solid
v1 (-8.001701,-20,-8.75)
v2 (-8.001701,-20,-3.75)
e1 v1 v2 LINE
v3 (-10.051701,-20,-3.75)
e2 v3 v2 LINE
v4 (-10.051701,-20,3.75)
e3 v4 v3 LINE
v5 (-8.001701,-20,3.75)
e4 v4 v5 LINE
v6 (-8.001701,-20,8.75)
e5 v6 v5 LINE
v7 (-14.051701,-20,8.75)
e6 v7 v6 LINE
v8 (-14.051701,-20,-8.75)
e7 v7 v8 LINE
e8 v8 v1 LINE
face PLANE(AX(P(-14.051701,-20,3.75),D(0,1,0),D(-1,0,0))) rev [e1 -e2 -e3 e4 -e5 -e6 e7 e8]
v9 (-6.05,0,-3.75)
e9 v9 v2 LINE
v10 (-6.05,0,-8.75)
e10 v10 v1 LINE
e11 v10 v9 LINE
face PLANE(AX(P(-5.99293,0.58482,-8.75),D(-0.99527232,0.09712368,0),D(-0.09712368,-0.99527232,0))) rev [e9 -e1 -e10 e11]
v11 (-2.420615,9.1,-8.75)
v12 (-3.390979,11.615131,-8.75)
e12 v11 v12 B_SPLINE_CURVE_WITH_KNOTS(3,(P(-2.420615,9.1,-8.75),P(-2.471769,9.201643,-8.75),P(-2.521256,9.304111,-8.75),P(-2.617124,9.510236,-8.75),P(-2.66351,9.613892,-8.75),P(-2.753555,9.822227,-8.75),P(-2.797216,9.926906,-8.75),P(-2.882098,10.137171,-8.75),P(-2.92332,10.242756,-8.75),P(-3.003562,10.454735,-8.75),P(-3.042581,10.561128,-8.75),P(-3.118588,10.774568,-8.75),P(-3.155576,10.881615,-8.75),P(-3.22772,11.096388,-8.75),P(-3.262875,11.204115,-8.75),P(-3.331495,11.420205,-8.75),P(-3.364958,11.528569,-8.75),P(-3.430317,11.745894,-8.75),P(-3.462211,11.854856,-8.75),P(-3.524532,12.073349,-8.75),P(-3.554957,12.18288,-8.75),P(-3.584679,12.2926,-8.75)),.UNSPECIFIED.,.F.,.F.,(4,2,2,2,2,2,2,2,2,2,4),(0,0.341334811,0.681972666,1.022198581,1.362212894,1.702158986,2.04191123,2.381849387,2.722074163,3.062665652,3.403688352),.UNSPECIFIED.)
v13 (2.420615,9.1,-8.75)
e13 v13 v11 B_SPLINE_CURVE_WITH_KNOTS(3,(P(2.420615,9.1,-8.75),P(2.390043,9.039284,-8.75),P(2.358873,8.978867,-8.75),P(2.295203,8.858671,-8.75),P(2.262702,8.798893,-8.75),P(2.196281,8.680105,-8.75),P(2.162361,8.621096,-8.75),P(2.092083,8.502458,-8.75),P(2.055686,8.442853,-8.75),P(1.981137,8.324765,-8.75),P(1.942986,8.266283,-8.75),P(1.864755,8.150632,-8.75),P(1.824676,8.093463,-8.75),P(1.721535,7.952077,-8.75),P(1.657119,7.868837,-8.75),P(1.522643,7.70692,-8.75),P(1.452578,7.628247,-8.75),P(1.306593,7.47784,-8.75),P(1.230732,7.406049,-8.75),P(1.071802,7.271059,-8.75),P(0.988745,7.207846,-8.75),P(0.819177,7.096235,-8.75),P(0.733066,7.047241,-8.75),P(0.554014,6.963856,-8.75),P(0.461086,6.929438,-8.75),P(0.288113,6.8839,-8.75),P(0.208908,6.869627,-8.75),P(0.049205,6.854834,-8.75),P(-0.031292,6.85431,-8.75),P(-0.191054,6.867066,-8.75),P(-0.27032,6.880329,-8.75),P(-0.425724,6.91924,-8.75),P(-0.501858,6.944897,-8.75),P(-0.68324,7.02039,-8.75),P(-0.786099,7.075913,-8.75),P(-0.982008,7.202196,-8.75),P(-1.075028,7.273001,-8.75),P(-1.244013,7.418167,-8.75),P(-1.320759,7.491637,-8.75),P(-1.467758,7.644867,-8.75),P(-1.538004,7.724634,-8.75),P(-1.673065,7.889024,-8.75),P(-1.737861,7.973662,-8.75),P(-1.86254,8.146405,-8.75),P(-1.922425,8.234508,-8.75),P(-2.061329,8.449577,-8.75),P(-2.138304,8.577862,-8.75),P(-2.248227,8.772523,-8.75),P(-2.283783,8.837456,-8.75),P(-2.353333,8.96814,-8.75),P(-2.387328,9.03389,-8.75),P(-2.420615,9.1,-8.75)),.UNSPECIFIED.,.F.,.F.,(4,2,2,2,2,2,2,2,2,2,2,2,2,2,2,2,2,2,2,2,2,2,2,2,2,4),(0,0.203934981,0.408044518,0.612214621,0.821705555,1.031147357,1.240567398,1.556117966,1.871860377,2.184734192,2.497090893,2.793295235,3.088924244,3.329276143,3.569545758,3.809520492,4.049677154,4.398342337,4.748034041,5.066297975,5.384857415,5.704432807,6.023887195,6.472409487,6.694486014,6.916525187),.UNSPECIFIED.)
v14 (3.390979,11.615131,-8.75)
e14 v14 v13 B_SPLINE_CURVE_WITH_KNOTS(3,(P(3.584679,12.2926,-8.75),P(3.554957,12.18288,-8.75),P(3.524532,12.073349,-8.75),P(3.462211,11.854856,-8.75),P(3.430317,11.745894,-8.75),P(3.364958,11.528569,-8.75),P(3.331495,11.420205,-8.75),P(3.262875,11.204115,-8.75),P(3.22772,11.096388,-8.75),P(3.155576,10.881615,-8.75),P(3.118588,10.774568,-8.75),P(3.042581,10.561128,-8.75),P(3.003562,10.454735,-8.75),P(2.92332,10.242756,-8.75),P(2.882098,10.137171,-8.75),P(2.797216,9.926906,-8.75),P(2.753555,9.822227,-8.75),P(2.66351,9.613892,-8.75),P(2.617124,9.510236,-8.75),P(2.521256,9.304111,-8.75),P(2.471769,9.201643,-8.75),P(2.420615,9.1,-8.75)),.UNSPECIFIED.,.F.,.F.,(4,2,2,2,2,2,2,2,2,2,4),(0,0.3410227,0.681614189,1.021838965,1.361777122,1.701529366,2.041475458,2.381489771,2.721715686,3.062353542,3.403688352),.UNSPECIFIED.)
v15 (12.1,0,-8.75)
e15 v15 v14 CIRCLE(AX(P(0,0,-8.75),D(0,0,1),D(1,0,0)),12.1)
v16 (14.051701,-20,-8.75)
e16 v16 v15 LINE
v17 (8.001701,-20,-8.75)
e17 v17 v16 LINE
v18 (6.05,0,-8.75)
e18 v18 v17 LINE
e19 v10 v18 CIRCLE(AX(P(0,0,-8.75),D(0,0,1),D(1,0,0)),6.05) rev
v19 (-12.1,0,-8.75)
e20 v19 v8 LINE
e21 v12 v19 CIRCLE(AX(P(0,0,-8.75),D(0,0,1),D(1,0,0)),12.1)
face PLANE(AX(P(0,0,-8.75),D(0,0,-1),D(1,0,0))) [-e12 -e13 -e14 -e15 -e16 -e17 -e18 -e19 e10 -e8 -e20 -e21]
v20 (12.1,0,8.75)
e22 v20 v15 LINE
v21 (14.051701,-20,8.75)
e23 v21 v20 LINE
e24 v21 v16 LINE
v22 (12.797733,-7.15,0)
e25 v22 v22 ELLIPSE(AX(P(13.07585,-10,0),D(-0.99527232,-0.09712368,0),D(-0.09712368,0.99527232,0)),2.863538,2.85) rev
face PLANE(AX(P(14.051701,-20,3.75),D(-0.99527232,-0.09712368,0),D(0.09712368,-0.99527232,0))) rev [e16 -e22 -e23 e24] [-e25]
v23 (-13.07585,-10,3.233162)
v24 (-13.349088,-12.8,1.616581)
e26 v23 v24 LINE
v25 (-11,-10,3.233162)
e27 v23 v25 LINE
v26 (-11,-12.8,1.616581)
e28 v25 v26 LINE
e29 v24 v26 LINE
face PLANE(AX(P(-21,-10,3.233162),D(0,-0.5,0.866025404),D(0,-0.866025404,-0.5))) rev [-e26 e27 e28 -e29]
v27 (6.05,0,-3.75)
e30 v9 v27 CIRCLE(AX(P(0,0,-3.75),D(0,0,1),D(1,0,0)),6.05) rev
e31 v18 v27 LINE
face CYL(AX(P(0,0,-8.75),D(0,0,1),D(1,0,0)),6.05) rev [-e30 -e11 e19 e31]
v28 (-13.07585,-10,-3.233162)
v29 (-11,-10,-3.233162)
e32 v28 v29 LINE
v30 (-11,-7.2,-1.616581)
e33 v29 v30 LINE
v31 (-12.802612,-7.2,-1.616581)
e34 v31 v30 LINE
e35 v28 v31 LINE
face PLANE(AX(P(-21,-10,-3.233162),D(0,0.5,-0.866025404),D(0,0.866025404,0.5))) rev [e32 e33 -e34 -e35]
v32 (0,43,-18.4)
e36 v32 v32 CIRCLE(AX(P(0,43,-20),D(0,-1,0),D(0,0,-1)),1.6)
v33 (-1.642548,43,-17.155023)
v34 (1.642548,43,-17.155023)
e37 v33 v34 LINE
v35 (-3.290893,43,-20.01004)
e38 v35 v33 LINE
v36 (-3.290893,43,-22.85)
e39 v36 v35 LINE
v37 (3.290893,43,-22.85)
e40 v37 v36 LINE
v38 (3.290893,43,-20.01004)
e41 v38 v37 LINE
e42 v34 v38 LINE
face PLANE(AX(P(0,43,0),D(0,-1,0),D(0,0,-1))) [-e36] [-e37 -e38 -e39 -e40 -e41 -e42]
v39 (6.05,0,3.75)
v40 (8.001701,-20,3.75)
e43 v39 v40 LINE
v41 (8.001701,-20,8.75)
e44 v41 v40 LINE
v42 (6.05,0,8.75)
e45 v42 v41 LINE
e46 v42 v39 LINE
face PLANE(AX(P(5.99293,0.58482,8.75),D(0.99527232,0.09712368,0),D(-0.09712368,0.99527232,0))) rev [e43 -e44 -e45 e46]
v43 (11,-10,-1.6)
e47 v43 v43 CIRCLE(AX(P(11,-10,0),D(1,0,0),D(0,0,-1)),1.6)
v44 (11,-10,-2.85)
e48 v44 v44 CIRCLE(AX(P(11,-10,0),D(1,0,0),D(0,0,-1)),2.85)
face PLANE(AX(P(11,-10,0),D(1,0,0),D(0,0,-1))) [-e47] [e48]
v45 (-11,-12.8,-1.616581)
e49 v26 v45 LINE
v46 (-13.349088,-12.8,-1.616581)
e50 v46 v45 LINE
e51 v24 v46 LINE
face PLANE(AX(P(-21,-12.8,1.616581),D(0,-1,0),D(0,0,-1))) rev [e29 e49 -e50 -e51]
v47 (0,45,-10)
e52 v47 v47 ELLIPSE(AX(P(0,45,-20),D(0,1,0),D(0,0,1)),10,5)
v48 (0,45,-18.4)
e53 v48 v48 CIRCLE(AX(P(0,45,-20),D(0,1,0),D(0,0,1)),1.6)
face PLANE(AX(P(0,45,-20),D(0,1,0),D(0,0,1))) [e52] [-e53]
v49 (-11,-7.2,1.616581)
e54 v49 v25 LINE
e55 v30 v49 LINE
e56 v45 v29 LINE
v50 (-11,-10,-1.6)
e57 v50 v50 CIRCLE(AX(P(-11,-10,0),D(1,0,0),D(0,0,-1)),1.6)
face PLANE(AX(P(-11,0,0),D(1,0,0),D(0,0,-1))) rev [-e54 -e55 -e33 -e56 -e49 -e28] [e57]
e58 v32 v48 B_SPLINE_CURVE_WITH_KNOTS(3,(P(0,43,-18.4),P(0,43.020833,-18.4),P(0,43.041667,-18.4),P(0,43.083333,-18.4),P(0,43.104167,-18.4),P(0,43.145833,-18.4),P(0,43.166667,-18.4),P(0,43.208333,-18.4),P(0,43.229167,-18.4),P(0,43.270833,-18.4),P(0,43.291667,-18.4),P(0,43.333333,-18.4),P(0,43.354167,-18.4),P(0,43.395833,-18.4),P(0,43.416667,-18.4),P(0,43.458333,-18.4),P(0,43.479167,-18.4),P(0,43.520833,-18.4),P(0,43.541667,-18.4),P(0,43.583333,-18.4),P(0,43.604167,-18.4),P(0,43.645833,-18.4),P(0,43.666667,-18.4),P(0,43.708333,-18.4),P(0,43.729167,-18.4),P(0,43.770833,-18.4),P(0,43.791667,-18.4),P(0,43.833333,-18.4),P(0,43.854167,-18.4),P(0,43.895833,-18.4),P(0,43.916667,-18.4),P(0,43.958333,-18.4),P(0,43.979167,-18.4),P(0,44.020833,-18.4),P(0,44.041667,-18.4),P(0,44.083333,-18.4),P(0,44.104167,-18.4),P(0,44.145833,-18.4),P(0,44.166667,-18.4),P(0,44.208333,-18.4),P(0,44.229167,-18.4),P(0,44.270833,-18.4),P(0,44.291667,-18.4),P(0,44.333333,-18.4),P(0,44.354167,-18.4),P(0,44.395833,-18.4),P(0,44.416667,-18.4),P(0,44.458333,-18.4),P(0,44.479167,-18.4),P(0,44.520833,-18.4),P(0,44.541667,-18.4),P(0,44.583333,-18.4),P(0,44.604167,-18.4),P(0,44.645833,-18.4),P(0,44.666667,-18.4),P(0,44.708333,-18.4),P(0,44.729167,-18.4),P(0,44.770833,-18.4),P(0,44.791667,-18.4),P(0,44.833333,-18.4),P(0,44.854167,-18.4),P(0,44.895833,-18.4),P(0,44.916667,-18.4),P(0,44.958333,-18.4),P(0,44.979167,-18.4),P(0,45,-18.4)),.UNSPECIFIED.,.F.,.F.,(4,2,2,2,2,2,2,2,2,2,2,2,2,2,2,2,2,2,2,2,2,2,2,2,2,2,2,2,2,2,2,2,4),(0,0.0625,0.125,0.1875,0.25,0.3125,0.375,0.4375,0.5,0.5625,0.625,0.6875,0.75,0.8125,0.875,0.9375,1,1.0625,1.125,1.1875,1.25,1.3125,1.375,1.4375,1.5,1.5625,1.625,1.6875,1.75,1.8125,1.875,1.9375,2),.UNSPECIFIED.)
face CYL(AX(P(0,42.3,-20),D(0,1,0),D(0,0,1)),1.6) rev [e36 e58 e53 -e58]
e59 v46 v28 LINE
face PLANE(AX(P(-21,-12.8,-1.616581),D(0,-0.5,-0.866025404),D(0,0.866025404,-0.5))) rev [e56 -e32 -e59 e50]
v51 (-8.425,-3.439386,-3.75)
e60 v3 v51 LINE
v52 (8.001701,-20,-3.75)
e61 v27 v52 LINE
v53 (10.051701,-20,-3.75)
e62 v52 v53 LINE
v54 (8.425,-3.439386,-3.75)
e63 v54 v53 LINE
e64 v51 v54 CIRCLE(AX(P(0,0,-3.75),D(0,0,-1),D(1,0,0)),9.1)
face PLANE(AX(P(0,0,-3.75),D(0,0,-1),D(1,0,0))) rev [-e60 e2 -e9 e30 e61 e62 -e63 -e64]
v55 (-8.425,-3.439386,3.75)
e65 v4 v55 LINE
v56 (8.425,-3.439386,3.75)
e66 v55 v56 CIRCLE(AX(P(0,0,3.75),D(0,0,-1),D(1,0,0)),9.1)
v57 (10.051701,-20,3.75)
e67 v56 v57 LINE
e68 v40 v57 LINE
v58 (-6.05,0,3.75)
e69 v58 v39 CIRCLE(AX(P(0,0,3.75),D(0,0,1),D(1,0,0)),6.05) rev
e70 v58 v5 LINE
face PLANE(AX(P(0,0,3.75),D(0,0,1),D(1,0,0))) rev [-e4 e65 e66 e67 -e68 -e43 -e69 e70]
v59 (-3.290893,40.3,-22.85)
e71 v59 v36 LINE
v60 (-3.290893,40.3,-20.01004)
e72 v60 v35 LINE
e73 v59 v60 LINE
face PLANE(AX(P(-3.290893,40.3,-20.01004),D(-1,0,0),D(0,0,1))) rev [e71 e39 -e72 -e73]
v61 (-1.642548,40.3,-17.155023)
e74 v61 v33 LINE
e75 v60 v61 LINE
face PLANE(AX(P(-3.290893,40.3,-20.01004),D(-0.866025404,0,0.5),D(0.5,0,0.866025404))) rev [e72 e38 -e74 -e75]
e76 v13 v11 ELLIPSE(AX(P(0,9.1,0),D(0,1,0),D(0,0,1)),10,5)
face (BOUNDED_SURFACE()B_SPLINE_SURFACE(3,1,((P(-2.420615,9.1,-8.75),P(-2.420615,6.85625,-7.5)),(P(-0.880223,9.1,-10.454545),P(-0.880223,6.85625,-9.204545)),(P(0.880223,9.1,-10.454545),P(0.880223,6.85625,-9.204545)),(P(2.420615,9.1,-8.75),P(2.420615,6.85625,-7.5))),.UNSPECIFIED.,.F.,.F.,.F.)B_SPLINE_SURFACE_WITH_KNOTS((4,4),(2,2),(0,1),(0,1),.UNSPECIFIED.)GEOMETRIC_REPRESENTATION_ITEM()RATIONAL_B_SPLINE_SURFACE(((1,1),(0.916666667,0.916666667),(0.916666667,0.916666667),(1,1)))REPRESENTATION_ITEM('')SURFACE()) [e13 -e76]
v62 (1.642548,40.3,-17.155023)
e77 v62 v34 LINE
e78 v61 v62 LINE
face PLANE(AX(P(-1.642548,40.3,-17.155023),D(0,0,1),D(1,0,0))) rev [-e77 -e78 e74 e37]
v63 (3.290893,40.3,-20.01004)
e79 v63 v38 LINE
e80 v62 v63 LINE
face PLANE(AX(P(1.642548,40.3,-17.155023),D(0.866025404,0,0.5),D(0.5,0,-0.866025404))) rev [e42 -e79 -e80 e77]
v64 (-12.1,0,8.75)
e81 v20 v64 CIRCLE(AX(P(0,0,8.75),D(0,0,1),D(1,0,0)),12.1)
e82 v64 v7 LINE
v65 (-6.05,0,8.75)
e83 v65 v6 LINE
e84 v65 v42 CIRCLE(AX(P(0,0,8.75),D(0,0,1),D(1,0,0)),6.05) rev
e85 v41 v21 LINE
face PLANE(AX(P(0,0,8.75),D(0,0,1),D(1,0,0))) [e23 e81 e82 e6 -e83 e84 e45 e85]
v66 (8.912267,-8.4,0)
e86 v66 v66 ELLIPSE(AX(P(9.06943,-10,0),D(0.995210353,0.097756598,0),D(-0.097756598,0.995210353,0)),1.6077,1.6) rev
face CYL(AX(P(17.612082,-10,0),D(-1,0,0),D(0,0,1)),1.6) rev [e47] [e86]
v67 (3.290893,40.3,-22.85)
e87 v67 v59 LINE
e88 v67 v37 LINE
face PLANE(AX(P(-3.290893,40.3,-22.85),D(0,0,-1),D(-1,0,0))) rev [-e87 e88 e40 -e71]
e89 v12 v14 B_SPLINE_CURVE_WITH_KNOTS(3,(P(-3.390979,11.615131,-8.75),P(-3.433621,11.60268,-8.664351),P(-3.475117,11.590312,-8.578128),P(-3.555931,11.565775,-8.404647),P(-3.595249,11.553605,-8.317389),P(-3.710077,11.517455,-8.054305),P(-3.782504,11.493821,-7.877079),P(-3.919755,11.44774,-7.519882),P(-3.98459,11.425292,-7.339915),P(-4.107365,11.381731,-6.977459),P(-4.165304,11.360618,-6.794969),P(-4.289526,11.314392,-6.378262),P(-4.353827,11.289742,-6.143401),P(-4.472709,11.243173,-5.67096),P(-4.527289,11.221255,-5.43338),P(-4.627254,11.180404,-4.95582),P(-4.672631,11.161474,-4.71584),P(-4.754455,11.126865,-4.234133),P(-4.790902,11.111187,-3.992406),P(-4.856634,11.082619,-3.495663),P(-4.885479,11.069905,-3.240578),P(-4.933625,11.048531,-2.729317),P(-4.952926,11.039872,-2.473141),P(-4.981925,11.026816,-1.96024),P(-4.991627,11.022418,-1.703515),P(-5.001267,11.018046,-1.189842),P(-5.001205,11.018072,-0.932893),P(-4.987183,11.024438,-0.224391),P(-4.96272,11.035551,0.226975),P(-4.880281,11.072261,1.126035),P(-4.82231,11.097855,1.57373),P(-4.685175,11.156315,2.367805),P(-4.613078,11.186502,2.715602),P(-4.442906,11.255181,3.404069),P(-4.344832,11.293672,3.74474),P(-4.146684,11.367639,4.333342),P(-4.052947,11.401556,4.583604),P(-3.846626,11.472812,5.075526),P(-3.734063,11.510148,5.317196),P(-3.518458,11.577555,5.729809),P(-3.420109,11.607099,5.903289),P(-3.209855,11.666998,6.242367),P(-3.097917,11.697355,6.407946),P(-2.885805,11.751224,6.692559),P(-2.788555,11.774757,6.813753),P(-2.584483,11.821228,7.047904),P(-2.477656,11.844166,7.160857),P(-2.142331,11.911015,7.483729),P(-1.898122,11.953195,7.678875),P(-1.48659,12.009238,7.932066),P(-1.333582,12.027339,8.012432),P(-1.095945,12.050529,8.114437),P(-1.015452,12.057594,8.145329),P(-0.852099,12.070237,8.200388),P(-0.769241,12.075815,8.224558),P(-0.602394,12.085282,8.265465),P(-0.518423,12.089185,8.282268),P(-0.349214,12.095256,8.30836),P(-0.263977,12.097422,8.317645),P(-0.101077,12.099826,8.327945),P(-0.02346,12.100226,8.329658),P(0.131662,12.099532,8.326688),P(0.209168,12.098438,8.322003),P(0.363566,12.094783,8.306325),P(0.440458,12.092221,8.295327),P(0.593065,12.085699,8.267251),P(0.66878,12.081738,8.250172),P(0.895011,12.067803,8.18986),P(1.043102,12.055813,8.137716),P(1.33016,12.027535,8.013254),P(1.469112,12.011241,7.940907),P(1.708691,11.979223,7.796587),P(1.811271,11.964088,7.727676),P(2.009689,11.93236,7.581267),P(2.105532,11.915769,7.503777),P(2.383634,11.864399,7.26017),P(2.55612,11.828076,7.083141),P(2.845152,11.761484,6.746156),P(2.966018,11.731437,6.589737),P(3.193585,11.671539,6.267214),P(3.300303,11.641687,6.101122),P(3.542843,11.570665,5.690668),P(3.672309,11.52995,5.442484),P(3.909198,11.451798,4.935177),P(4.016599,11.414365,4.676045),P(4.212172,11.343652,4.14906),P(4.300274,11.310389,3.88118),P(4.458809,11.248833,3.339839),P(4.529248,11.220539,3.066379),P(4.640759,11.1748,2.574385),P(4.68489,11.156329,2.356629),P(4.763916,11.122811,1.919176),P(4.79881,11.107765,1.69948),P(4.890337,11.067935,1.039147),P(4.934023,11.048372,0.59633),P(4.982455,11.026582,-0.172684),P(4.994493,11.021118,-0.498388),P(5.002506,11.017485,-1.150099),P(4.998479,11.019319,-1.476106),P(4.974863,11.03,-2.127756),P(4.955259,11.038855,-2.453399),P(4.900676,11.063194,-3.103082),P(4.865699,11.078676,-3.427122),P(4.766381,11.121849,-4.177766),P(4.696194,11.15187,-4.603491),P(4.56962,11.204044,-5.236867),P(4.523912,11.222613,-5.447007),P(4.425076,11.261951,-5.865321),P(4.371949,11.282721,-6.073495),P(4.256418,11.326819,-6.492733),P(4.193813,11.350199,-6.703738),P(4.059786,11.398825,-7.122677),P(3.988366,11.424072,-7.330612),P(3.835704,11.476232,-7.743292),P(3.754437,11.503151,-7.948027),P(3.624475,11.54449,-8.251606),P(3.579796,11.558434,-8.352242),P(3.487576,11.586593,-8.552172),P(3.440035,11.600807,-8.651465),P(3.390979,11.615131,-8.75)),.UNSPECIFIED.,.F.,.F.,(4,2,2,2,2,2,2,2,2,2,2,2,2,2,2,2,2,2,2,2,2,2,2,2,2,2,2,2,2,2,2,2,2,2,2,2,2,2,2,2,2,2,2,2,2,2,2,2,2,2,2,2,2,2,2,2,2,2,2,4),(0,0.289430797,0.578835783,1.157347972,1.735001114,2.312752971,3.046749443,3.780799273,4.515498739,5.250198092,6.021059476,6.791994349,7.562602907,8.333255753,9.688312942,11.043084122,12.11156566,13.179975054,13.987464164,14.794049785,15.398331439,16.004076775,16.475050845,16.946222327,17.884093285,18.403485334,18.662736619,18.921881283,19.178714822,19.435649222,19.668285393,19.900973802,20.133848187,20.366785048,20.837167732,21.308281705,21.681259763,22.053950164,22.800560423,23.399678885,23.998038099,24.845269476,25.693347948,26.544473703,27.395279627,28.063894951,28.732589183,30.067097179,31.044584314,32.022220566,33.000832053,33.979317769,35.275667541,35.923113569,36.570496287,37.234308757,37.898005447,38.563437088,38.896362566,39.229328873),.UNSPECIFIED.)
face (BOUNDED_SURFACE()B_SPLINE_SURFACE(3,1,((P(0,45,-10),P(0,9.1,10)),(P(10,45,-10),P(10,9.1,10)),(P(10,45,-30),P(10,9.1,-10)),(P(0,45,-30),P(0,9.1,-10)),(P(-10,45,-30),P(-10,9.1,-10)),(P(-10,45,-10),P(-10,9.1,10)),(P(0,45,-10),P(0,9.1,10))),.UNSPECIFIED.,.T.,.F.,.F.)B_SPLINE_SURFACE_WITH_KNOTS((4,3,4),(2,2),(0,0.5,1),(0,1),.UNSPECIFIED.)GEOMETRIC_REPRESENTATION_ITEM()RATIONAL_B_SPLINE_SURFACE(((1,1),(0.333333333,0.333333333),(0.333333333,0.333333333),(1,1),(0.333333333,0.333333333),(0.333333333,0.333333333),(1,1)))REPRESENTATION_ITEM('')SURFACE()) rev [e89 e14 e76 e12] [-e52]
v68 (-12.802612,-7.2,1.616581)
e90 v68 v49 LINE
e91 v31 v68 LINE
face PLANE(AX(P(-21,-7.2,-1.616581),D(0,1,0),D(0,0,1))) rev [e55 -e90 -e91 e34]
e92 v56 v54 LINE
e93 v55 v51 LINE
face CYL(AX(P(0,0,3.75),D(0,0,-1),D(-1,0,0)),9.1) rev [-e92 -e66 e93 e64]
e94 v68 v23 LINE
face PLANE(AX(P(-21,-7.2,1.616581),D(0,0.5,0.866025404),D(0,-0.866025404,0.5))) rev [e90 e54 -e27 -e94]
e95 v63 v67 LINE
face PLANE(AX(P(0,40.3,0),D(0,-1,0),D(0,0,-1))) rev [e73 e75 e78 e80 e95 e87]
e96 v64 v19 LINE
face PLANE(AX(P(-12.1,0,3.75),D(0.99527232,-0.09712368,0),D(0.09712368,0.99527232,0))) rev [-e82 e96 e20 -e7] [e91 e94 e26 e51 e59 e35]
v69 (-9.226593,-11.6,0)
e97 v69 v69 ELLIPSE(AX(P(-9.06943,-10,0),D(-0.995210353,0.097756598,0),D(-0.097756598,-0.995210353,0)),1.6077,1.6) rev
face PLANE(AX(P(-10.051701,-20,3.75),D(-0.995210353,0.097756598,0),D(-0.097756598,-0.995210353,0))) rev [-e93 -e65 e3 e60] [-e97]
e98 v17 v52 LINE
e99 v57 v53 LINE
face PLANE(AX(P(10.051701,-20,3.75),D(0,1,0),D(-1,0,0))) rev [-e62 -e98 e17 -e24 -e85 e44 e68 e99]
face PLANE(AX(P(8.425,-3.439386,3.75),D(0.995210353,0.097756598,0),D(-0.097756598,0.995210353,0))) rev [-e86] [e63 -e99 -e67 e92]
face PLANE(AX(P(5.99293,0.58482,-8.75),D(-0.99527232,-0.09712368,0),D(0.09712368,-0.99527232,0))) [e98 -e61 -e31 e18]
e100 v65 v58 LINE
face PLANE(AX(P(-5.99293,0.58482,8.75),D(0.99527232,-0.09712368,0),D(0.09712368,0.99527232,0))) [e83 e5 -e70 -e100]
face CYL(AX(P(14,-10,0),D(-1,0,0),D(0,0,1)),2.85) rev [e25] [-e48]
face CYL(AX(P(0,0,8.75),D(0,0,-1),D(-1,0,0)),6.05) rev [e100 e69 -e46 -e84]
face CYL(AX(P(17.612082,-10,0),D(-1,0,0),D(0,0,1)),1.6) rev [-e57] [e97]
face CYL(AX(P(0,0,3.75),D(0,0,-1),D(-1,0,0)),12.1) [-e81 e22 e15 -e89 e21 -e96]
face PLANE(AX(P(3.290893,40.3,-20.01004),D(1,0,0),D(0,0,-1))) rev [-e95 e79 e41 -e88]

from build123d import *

# Parameters (mm, degrees)
BOSS_EXTRUDE1_DEPTH         = 3.75
BOLT_HOLE_REACH             = 26.729
SKETCH2_R                   = 1.6
BOLT_HOLE_DIRECTION_2_REACH = 26.729
BOSS_EXTRUDE2_START         = 5
BOSS_EXTRUDE2_DEPTH         = 5
CUT_EXTRUDE2_START          = 11
SKETCH4_R                   = 2.85
CUT_EXTRUDE2_DEPTH          = 3
SKETCH7_RX                  = 10
SKETCH7_RY                  = 5
SWEEP2_START                = 10.247926509
SWEEP2_DEPTH                = 2.568432868
SKETCH11_W                  = 7.251223943
SKETCH11_H                  = 3.177760732
CUT_EXTRUDE3_DEPTH          = 20
CUT_EXTRUDE5_START          = -2
CUT_EXTRUDE5_DEPTH          = 2.7
SKETCH13_R                  = 1.6
CUT_EXTRUDE6_DEPTH          = 2.7
CUT_EXTRUDE7_START          = -11
CUT_EXTRUDE7_DEPTH          = 10


# Read off the part's stored shape, not the designer's step: Sweep2
with BuildPart() as part:
    # Sketch1 → Boss-Extrude1 (new, symmetric)
    with BuildSketch(Plane.XY):
        with BuildLine():
            Line((-12.1, 0), (-14.051700625, -20))
            Line((-14.051700625, -20), (-10.051700625, -20))
            Line((-10.051700625, -20), (-8.425, -3.439385846))
            ThreePointArc((-8.425, -3.439385846), (0, 9.1), (8.425, -3.439385846))
            Line((8.425, -3.439385846), (10.051700625, -20))
            Line((10.051700625, -20), (14.051700625, -20))
            Line((14.051700625, -20), (12.1, 0))
            ThreePointArc((12.1, 0), (0, 12.1), (-12.1, 0))
        make_face()
    extrude(amount=BOSS_EXTRUDE1_DEPTH, both=True)

    # Bolt Hole: up to this plane
    bolt_hole_end = Plane(origin=(14.051700625, -20, 3.75), z_dir=(-0.995272319868323, -0.09712368044883128, 0))
    # Sketch2 → Bolt Hole (cut, up to the surface)
    with BuildSketch(Plane(origin=(0, 0, 0), x_dir=(0, 0, -1), z_dir=(1, 0, 0)), mode=Mode.PRIVATE) as bolt_hole_sk1:
        with Locations(Location((0, -10, 0), (0, 0, 90))):
            Circle(SKETCH2_R)
    bolt_hole_tool1 = split(extrude(bolt_hole_sk1.sketch, amount=BOLT_HOLE_REACH, mode=Mode.PRIVATE), bisect_by=bolt_hole_end, keep=Keep.BOTH, mode=Mode.PRIVATE)
    add(bolt_hole_tool1.solids().sort_by_distance((0, -10, 0))[0], mode=Mode.SUBTRACT)

    # Bolt Hole direction 2: up to this plane
    bolt_hole_direction_2_end = Plane(origin=(-12.1, 0, 3.75), z_dir=(0.995272319868323, -0.09712368044883138, 0))
    # Sketch2 → Bolt Hole direction 2 (cut, up to the surface)
    with BuildSketch(Plane(origin=(0, 0, 0), x_dir=(0, 0, -1), z_dir=(1, 0, 0)), mode=Mode.PRIVATE) as bolt_hole_direction_2_sk1:
        with Locations(Location((0, -10, 0), (0, 0, 90))):
            Circle(SKETCH2_R)
    bolt_hole_direction_2_tool1 = split(extrude(bolt_hole_direction_2_sk1.sketch, amount=-BOLT_HOLE_DIRECTION_2_REACH, mode=Mode.PRIVATE), bisect_by=bolt_hole_direction_2_end, keep=Keep.BOTH, mode=Mode.PRIVATE)
    add(bolt_hole_direction_2_tool1.solids().sort_by_distance((0, -10, 0))[0], mode=Mode.SUBTRACT)

    # Sketch3 → Boss-Extrude2 (add)
    with BuildSketch(Plane.XY.offset(3.75).offset(BOSS_EXTRUDE2_START)):
        with BuildLine():
            ThreePointArc((12.1, 0), (0, 12.1), (-12.1, 0))
            Line((-12.1, 0), (-6.05, 0))
            ThreePointArc((-6.05, 0), (0, 6.05), (6.05, 0))
            Line((6.05, 0), (12.1, 0))
        make_face()
        Polygon((-6.05, 0), (-12.1, 0), (-14.051700625, -20), (-8.001700625, -20), align=None)
        Polygon((14.051700625, -20), (12.1, 0), (6.05, 0), (8.001700625, -20), align=None)
    boss_extrude2 = extrude(amount=-BOSS_EXTRUDE2_DEPTH)

    # Sketch4 → Cut-Extrude2 (cut)
    with BuildSketch(Plane(origin=(0, 0, 0), x_dir=(0, 0, -1), z_dir=(1, 0, 0)).offset(CUT_EXTRUDE2_START)):
        with Locations(Location((0, -10, 0), (0, 0, 90))):
            Circle(SKETCH4_R)
    extrude(amount=CUT_EXTRUDE2_DEPTH, mode=Mode.SUBTRACT)

    # Sweep1: sweep along a path in Sketch8
    with BuildLine(Plane(origin=(0, 0, 0), x_dir=(0, 0, -1), z_dir=(1, 0, 0))) as sweep1_path:
        Line((20, 45), (0, 9.1))
    # Sketch7 → Sweep1 (sweep)
    with BuildSketch(Plane(origin=(0, 45, 0), x_dir=(1, 0, 0), z_dir=(0, 1, 0))):
        with Locations(Location((0, 20), (0, 0, -90))):
            Ellipse(SKETCH7_RX, SKETCH7_RY)
    sweep(path=sweep1_path.line)

    # Mirror2: Boss-Extrude2 across plane
    add(boss_extrude2.mirror(Plane.XY))

    # Sweep2 outline → Sweep2 (add)
    with BuildSketch(Plane(origin=(0, 0, 0), x_dir=(1, 0, 0), z_dir=(0, 0.8735827557825672, -0.48667562996243774)).offset(SWEEP2_START)):
        with BuildLine():
            add(Edge.make_bspline(
                [(-2.420614591, 3.21510088), (-4.140808386, 1.552228138), (-6.669000046, -3.159441487), (-5.965430129, -9.385769202), (-3.27241307, -12.380396445), (-1.32464484, -13.16457579), (1.32464484, -13.16457579), (3.27241307, -12.380396445), (5.965430129, -9.385769202), (6.669000046, -3.159441487), (4.140808386, 1.552228138), (1.714602002, 3.897587408), (0.891272318, 4.380182485), (0, 4.554319728), (-0.891272318, 4.380182485), (-1.714602002, 3.897587408), (-2.420614591, 3.21510088)],
                knots=[0.602606548, 0.602606548, 0.602606548, 0.602606548, 0.602606548, 0.602606548, 0.602606548, 1, 1, 1, 1, 1, 1.397393452, 1.397393452, 1.397393452, 1.397393452, 1.397393452, 1.560494133, 1.560494133, 1.560494133, 1.560494133, 1.560494133, 1.560494133, 1.560494133], degree=6, weights=[1, 1, 0.816743691, 0.81626183, 0.938272083, 1, 1, 0.938272083, 0.81626183, 0.816743691, 1, 1, 0.995833333, 0.99375, 0.995833333, 1, 1]))
        make_face()
    extrude(amount=SWEEP2_DEPTH)

    # Sketch11 → Cut-Extrude3 (cut)
    with BuildSketch(Plane(origin=(0, 0, 0), x_dir=(1, 0, 0), z_dir=(0, 1, 0))):
        with Locations((-0.008642554, -10.338880366)):
            Rectangle(SKETCH11_W, SKETCH11_H)
    extrude(amount=CUT_EXTRUDE3_DEPTH, mode=Mode.SUBTRACT)

    # Sketch12 → Cut-Extrude5 (cut)
    with BuildSketch(Plane(origin=(0, 45, 0), x_dir=(1, 0, 0), z_dir=(0, 1, 0)).offset(CUT_EXTRUDE5_START)):
        Polygon((-3.290892766, 20.010039827), (-3.290892766, 22.85), (3.290892766, 22.85), (3.290892766, 20.010039827), (1.642548134, 17.155023177), (-1.642548134, 17.155023177), align=None)
    extrude(amount=-CUT_EXTRUDE5_DEPTH, mode=Mode.SUBTRACT)

    # Sketch13 → Cut-Extrude6 (cut)
    with BuildSketch(Plane(origin=(0, 45, 0), x_dir=(1, 0, 0), z_dir=(0, 1, 0))):
        with Locations(Location((0, 20, 0), (0, 0, 270))):
            Circle(SKETCH13_R)
    extrude(amount=-CUT_EXTRUDE6_DEPTH, mode=Mode.SUBTRACT)

    # Sketch14 → Cut-Extrude7 (cut)
    with BuildSketch(Plane(origin=(0, 0, 0), x_dir=(0, 0, -1), z_dir=(1, 0, 0)).offset(CUT_EXTRUDE7_START)):
        Polygon((-3.233161507, -10), (-1.616580754, -12.8), (1.616580754, -12.8), (3.233161507, -10), (1.616580754, -7.2), (-1.616580754, -7.2), align=None)
    extrude(amount=-CUT_EXTRUDE7_DEPTH, mode=Mode.SUBTRACT)


solid = part.part
